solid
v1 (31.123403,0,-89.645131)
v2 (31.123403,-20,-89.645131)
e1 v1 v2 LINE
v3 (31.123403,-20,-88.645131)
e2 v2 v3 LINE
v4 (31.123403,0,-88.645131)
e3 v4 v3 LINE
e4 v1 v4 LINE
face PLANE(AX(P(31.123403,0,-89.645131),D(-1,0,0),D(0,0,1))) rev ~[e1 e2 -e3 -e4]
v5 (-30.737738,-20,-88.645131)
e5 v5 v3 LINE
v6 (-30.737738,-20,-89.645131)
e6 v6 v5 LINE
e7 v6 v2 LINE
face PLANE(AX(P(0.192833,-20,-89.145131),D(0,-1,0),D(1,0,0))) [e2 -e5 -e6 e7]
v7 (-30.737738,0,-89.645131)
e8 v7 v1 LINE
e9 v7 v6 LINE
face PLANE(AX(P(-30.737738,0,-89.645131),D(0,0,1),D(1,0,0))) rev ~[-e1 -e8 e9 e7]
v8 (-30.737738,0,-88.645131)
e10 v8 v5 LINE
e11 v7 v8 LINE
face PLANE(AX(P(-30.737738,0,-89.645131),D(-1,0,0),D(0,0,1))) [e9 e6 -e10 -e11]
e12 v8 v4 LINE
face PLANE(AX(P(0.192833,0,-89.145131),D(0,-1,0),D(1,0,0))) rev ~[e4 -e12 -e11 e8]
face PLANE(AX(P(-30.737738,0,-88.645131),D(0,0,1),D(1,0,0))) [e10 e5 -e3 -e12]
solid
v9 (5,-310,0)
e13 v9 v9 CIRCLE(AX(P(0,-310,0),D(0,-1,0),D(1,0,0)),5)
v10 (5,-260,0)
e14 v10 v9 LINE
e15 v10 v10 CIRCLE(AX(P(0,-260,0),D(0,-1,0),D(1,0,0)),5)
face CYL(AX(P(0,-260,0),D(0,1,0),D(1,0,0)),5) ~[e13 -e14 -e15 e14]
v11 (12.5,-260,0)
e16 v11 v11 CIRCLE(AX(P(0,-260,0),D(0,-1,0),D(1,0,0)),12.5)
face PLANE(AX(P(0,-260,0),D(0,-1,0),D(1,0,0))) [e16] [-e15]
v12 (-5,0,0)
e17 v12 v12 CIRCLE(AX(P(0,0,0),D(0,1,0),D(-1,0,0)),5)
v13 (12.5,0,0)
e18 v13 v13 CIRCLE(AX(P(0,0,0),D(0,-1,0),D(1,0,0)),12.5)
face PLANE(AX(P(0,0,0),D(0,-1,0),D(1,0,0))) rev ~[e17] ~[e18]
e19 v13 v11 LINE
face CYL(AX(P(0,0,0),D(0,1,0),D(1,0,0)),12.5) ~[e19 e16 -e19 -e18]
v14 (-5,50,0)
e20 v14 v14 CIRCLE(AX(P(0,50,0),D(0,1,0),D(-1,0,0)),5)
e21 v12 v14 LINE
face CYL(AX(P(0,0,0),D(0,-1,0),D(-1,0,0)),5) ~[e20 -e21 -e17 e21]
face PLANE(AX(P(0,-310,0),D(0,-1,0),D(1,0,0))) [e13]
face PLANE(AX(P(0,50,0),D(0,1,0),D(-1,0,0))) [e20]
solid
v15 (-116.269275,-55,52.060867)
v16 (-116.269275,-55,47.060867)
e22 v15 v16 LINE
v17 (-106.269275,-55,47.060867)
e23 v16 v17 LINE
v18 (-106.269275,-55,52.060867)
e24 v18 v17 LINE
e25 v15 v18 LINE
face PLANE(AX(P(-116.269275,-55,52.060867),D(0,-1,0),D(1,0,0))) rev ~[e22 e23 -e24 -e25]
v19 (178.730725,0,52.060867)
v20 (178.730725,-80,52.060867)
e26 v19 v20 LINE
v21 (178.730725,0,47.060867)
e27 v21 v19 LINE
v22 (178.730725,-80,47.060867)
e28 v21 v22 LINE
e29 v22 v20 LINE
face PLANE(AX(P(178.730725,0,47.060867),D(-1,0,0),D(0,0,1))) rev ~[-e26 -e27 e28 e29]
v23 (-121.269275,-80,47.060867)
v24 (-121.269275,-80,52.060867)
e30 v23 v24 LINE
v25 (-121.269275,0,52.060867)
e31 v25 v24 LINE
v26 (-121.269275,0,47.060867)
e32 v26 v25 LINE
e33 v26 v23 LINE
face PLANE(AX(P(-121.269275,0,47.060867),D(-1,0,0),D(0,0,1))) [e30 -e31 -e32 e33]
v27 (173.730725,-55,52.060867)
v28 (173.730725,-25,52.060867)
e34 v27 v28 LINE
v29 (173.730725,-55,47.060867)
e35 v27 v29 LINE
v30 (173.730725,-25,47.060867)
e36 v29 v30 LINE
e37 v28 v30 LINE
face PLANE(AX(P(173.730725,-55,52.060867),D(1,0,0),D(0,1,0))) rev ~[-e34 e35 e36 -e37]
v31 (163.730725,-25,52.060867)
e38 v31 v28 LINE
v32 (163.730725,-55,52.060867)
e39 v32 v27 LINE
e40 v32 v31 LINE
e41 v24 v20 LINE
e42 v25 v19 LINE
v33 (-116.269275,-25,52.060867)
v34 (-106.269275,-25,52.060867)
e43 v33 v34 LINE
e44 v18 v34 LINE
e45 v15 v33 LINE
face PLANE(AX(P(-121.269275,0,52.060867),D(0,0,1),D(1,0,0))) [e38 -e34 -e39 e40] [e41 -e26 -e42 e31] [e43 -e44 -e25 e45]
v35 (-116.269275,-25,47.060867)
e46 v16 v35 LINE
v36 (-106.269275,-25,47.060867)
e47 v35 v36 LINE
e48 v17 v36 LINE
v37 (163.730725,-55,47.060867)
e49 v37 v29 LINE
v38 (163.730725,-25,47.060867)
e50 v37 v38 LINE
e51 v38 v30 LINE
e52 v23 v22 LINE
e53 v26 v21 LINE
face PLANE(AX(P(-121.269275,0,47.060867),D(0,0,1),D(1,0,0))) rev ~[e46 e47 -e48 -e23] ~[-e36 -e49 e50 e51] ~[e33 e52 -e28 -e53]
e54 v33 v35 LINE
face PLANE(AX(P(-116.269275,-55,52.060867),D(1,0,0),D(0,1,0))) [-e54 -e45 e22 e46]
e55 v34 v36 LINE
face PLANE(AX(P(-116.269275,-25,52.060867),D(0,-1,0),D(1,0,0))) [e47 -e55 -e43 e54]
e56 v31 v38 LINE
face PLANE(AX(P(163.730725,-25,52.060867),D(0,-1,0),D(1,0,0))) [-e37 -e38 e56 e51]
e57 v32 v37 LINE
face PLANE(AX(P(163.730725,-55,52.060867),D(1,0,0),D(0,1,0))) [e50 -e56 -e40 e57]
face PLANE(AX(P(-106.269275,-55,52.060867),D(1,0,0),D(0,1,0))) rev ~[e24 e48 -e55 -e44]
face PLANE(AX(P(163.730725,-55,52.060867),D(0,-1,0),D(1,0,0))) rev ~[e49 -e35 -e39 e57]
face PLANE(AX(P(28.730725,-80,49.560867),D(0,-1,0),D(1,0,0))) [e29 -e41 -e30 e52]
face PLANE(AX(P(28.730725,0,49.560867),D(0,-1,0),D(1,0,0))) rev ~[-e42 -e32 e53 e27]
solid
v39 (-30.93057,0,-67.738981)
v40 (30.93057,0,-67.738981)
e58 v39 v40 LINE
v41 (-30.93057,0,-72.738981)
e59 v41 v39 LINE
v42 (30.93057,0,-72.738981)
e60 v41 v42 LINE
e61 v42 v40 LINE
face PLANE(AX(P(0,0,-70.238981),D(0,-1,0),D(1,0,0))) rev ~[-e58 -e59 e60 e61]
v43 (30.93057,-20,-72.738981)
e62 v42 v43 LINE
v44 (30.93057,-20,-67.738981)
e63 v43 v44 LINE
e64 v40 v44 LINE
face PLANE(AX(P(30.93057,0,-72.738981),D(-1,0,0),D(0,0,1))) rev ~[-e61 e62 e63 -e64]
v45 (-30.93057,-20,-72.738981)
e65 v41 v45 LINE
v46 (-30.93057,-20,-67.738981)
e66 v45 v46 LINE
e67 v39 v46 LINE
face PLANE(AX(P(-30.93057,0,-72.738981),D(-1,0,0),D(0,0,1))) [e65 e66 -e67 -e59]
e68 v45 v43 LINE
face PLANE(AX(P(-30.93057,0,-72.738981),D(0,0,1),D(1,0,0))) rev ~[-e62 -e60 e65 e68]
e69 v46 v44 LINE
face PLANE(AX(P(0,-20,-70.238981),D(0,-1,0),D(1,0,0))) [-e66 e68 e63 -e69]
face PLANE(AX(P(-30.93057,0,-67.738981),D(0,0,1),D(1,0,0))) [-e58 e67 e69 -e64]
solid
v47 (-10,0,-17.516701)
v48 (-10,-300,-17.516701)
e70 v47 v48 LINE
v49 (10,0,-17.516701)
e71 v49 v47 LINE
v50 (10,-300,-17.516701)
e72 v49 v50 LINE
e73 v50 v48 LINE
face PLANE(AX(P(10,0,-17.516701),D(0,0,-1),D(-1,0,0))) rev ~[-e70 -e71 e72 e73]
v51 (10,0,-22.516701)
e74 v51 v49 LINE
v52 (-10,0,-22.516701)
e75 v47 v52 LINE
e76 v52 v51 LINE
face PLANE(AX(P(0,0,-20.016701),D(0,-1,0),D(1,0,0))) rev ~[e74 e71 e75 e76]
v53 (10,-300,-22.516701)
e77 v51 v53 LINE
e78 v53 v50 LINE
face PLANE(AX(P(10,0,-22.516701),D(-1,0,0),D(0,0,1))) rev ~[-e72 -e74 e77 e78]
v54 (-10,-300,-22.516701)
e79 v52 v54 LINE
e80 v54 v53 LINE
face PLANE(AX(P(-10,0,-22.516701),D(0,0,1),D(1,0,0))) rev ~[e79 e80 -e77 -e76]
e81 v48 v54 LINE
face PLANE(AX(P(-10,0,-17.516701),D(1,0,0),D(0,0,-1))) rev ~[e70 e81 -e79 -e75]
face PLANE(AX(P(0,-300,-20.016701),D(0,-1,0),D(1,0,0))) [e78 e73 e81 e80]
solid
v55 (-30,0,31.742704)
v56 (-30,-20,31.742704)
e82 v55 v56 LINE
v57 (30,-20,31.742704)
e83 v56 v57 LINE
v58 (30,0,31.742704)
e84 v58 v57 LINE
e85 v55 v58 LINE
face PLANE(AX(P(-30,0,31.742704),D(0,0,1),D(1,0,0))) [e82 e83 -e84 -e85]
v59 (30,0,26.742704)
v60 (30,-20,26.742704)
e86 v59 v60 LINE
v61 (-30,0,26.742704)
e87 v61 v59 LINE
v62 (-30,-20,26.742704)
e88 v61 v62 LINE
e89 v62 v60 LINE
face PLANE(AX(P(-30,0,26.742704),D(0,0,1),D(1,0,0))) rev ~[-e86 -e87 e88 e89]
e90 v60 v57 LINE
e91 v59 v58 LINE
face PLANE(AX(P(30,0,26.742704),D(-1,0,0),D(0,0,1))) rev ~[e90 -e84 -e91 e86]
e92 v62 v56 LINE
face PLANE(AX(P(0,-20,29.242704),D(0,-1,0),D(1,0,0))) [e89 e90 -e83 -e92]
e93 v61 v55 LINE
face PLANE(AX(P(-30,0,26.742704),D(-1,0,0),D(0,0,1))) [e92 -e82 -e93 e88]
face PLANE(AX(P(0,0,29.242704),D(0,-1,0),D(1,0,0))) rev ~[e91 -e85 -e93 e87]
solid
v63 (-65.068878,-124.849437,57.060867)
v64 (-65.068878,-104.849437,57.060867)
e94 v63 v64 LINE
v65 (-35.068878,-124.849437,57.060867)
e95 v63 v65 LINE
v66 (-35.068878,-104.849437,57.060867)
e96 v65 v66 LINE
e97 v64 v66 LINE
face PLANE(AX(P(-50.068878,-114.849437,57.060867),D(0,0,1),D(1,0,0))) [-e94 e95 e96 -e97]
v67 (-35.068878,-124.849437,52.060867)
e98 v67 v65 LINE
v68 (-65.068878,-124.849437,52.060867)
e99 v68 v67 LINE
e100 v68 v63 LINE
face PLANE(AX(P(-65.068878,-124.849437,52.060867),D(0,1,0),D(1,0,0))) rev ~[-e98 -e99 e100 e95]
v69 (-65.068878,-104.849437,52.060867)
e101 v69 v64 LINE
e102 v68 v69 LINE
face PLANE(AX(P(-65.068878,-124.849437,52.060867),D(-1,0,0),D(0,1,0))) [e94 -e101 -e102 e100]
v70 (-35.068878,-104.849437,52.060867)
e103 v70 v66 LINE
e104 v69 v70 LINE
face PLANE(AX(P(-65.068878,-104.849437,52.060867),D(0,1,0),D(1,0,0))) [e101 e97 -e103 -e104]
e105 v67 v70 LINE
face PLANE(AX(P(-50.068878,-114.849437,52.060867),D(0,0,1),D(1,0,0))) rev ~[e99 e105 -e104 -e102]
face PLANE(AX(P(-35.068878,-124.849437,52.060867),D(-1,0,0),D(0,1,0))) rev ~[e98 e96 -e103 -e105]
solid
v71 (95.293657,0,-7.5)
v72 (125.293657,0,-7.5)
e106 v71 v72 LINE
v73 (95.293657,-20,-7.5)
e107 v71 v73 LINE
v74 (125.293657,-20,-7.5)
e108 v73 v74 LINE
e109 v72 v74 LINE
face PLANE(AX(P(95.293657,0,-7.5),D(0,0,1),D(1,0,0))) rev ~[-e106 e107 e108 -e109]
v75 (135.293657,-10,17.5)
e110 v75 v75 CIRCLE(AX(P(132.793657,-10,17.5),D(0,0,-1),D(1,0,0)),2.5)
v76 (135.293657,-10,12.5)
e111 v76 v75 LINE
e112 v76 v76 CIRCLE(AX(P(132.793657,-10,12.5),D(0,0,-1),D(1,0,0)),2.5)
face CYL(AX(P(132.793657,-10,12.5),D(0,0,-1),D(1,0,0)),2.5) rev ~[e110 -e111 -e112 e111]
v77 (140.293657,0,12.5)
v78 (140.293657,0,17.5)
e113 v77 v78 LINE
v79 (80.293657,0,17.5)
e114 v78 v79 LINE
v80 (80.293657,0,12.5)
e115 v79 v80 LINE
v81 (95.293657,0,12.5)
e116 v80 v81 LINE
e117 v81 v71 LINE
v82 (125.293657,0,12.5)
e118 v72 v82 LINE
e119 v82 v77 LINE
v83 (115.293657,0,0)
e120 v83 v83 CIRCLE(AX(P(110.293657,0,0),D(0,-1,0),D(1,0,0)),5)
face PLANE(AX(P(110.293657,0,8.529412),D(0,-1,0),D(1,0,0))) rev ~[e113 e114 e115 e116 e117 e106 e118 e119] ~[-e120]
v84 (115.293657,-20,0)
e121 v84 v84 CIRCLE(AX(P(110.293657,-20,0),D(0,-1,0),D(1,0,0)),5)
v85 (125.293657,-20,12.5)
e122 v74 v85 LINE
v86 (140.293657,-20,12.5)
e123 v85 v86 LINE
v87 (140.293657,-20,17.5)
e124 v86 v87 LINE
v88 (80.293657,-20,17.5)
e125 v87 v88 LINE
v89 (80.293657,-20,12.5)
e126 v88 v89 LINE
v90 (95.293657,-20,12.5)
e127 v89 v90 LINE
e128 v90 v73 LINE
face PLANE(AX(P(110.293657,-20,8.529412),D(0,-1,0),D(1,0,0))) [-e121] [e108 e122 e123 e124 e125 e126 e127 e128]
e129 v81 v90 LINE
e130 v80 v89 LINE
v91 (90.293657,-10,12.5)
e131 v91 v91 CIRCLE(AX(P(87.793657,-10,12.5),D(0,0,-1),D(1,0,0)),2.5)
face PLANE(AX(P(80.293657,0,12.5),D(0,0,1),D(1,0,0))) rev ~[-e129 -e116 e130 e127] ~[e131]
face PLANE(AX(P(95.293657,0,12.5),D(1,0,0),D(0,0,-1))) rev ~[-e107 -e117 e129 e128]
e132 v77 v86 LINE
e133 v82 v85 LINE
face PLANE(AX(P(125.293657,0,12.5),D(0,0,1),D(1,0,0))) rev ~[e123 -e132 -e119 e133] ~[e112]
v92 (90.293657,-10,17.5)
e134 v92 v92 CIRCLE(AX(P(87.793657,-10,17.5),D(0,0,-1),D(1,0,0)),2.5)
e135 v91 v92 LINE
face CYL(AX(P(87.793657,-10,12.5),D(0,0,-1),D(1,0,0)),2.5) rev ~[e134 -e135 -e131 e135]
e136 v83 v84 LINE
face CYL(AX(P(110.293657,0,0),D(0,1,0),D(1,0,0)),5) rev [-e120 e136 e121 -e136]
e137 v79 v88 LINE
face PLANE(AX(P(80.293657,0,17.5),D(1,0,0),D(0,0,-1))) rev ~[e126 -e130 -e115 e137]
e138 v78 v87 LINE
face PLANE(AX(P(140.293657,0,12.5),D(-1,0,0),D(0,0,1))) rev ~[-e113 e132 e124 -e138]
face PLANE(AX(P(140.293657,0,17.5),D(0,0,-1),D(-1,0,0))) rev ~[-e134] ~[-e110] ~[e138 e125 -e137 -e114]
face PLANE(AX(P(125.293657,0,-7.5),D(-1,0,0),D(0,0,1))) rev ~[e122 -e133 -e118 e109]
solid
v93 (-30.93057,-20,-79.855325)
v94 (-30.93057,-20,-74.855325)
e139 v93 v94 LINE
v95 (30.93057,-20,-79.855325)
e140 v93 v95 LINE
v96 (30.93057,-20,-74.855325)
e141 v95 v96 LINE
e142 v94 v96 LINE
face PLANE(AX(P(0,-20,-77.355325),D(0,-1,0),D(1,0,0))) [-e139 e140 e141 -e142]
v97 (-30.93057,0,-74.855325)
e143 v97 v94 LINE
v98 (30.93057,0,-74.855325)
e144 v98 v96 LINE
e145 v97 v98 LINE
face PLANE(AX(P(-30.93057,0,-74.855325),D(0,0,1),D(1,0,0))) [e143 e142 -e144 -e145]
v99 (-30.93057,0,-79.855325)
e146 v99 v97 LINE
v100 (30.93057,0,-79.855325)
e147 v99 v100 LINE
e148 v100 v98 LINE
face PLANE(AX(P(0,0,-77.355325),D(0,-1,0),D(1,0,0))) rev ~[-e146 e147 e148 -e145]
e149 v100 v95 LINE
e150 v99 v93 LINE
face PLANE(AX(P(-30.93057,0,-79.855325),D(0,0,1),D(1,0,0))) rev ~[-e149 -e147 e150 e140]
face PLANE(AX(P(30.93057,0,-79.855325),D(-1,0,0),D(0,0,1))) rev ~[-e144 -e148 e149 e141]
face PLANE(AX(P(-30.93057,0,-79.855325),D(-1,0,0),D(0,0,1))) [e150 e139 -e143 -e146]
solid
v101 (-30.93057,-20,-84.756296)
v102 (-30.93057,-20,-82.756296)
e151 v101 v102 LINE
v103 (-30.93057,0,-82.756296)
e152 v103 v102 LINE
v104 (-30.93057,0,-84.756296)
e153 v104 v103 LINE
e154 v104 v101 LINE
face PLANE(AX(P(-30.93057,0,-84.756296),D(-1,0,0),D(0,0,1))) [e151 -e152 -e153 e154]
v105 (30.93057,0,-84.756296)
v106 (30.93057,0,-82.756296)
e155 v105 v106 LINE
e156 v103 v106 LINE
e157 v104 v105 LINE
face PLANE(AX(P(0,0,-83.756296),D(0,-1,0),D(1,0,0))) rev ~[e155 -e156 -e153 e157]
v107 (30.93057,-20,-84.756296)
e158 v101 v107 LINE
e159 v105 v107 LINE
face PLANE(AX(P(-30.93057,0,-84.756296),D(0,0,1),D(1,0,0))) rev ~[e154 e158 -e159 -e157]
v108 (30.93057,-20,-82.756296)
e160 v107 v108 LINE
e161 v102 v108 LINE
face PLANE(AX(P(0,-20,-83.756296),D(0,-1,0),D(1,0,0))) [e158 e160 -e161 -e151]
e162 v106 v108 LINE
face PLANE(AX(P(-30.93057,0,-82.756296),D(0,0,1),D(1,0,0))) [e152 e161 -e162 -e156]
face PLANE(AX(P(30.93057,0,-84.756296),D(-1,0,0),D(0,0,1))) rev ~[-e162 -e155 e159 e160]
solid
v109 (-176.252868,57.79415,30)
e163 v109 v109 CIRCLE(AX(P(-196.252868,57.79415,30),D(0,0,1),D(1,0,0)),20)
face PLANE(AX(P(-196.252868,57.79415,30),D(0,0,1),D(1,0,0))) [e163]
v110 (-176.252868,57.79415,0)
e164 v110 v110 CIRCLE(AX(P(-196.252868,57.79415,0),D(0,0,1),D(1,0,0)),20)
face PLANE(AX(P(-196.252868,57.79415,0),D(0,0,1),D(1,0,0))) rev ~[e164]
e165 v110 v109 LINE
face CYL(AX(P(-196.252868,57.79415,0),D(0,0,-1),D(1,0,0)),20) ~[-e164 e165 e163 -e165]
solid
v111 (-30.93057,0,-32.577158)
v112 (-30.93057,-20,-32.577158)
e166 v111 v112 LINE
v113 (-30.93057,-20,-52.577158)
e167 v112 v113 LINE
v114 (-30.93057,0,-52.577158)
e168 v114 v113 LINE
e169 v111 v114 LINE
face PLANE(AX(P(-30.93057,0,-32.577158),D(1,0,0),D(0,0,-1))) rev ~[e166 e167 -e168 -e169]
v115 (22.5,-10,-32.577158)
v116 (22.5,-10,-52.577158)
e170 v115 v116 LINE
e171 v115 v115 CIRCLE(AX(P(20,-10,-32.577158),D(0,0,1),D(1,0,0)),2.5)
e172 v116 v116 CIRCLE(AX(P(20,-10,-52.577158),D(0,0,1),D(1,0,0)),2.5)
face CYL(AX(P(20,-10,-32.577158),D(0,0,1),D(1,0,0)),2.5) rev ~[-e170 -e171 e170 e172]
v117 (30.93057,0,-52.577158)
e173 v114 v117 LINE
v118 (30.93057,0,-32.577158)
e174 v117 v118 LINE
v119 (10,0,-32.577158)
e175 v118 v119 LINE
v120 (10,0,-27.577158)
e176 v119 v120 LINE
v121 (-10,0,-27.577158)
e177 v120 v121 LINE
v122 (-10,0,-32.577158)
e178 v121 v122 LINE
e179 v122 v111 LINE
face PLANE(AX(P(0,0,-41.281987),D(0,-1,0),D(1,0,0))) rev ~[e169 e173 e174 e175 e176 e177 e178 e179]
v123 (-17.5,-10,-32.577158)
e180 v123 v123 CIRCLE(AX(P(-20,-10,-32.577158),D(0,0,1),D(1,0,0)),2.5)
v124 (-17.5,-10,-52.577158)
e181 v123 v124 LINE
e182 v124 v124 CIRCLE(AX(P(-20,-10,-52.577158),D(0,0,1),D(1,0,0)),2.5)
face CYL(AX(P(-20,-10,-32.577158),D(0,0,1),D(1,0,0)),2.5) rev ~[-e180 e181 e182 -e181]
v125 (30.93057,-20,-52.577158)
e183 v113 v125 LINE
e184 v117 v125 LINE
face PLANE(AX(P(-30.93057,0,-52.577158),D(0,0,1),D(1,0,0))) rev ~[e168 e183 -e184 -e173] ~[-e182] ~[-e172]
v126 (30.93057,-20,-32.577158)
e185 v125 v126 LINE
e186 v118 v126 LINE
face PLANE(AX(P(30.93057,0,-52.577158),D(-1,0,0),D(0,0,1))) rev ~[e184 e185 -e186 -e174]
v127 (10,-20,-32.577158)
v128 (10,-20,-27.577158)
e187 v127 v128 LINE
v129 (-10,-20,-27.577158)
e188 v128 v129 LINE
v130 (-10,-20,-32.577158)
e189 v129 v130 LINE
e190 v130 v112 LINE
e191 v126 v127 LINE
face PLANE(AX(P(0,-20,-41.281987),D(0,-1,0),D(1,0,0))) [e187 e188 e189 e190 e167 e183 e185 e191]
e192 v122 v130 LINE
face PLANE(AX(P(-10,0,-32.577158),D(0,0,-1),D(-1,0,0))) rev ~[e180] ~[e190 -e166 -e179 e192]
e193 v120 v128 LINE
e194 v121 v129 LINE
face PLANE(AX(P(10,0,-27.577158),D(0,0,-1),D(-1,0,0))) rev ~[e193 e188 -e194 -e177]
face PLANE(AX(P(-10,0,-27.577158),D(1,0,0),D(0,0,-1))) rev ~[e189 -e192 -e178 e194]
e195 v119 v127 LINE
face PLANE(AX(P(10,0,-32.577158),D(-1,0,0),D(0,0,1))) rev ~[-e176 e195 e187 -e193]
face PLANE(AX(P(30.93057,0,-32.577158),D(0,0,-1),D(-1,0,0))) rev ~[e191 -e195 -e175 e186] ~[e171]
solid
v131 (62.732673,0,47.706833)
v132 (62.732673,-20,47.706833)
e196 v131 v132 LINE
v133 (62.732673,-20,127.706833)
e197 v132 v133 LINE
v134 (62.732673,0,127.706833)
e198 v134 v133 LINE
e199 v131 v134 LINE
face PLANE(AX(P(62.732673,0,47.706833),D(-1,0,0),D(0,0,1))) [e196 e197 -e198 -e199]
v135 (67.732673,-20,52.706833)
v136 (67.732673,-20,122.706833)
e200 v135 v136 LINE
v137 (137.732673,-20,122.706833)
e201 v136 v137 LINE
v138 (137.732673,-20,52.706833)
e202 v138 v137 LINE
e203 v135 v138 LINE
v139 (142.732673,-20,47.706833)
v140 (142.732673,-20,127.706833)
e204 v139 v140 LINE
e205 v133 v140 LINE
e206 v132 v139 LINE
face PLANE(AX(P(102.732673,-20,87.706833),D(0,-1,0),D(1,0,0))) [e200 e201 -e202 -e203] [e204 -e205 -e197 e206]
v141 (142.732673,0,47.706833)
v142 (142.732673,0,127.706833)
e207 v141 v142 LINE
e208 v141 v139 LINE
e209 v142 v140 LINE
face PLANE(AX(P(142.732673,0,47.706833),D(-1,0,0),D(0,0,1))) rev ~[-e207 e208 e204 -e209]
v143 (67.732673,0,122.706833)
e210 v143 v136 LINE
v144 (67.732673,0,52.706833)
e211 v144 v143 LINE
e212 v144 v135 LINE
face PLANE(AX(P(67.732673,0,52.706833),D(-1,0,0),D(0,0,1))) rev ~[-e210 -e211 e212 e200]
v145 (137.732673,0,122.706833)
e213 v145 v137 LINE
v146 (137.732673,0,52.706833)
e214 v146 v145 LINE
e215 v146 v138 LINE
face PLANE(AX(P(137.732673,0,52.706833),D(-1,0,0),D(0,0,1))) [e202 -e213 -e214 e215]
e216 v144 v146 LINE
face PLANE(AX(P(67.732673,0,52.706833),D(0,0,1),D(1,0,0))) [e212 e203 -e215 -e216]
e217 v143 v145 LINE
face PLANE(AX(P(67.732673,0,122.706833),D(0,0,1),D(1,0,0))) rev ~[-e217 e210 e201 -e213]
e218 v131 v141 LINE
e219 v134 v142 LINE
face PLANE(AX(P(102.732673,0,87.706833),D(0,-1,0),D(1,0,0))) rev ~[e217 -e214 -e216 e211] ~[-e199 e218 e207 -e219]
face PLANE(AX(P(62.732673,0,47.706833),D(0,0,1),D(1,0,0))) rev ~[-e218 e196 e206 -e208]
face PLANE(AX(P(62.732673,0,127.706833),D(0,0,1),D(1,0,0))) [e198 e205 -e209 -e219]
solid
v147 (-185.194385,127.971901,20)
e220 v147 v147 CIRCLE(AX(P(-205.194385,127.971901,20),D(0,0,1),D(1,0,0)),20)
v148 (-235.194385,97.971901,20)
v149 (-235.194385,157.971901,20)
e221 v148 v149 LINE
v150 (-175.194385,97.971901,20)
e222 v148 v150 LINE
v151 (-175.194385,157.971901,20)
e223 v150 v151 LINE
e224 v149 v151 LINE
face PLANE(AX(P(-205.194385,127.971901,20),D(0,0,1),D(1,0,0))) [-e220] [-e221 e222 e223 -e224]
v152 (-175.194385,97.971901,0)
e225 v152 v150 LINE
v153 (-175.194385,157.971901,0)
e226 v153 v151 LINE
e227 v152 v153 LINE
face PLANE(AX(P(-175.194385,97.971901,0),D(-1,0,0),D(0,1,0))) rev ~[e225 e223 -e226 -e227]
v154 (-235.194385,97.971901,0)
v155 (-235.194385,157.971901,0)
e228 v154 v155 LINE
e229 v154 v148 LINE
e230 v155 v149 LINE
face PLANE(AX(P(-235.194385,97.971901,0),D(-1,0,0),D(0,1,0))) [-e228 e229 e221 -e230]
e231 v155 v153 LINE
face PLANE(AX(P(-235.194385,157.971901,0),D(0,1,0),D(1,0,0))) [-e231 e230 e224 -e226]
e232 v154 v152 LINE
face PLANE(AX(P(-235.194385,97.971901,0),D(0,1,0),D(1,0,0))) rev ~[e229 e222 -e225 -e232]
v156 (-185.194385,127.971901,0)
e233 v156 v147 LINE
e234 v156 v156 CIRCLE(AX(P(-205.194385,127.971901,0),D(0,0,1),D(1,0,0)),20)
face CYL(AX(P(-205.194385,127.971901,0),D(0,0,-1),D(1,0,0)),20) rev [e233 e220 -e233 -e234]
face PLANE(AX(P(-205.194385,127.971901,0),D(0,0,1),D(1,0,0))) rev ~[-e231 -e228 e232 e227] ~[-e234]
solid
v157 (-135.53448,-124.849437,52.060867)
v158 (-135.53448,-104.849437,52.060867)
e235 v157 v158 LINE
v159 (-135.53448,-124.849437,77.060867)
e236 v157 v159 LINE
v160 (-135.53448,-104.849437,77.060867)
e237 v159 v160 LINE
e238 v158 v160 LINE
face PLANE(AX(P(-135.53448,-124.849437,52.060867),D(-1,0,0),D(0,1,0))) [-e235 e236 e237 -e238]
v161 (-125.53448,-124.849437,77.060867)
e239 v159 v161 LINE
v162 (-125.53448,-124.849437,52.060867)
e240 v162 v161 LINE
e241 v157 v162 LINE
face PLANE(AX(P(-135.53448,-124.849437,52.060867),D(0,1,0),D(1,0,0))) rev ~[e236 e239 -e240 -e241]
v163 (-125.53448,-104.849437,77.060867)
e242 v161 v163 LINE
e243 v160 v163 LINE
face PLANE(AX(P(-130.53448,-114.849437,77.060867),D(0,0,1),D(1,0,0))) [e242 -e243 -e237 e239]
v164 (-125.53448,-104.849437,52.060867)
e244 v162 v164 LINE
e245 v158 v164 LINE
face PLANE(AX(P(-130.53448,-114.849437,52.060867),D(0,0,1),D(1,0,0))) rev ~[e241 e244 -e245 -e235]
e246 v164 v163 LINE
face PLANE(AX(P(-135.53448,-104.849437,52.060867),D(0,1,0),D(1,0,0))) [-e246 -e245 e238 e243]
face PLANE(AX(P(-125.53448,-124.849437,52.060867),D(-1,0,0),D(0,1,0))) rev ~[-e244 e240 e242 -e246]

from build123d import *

# Parameters (mm, degrees)
F0_R      = 5
F1_DEPTH  = 20
F0_W      = 60
F0_H      = 5
F0_W_2    = 80
F0_H_2    = 80
F0_W_3    = 70
F0_H_3    = 70
F0_W_4    = 61.861140081
F0_H_4    = 1
F0_H_5    = 2
F0_R_2    = 12.5
F2_DEPTH  = 260
F3_R      = 5
F4_DEPTH  = 50
F5_DEPTH  = 300
F6_R      = 2.5
F7_R      = 2.5
F8_DEPTH  = 25
F10_R     = 2.5
F9_R      = 2.5
F11_DEPTH = 25
F16_R     = 5
F17_DEPTH = 50
F18_W     = 300
F18_H     = 5
F19_DEPTH = 80
F21_R     = 20
F22_DEPTH = 30
F21_W     = 60
F21_H     = 60
F23_DEPTH = 20
F20_W     = 10
F20_H     = 30
F24_DEPTH = 141.7069985357
F20_H_2   = 20
F25_DEPTH = 25
F20_W_2   = 30
F26_DEPTH = 5


# Not quite as in the source:
# - a feature of the source that left no trace in its solid (it failed there, or was rolled back) is left out
# - a feature names something its author has since deleted; it is built from what else it names


with BuildPart() as f1:
    # F0 (on Front) → F1 (new body)
    with BuildSketch(Plane.XZ):
        Polygon((95.2936565876, -7.5), (110.2936565876, -7.5), (125.2936565876, -7.5), (125.2936565876, 12.5), (140.2936565876, 12.5), (140.2936565876, 17.5), (110.2936565876, 17.5), (80.2936565876, 17.5), (80.2936565876, 12.5), (95.2936565876, 12.5), align=None)
        with Locations((110.2936565876, 0)):
            Circle(F0_R, mode=Mode.SUBTRACT)
    extrude(amount=F1_DEPTH)

    # F10 (on face) + F9 (on face) → F11 (cut)
    with BuildSketch(Plane(origin=(0, 0, 12.5), x_dir=(1, 0, 0), z_dir=(0, 0, -1))):
        with Locations((87.7936565876, 10)):
            Circle(F10_R)
    with BuildSketch(Plane(origin=(0, 0, 12.5), x_dir=(1, 0, 0), z_dir=(0, 0, -1))):
        with Locations((132.7936565876, 10)):
            Circle(F9_R)
    extrude(amount=-F11_DEPTH, mode=Mode.SUBTRACT)


with BuildPart() as f1b:
    # F0 (on Front) → F1, piece 2 (new body)
    with BuildSketch(Plane.XZ):
        with Locations((0, 29.2427036911)):
            Rectangle(F0_W, F0_H)
    extrude(amount=F1_DEPTH)


with BuildPart() as f1c:
    # F0 (on Front) → F1, piece 3 (new body)
    with BuildSketch(Plane.XZ):
        Polygon((10, -27.5771580637), (0, -27.5771580637), (-10, -27.5771580637), (-10, -32.5771580637), (-10.9305700405, -32.5771580637), (-30.9305700405, -32.5771580637), (-30.9305700405, -52.5771580637), (0, -52.5771580637), (30.9305700405, -52.5771580637), (30.9305700405, -32.5771580637), (10.9305700405, -32.5771580637), (10, -32.5771580637), align=None)
    extrude(amount=F1_DEPTH)

    # F6 (on face) + F7 (on face) → F8 (cut)
    with BuildSketch(Plane.XY.offset(-32.5771580637)):
        with Locations((-20, -10)):
            Circle(F6_R)
    with BuildSketch(Plane.XY.offset(-32.5771580637)):
        with Locations((20, -10)):
            Circle(F7_R)
    extrude(amount=-F8_DEPTH, mode=Mode.SUBTRACT)


with BuildPart() as f1d:
    # F0 (on Front) → F1, piece 4 (new body)
    with BuildSketch(Plane.XZ):
        with Locations((102.7326732874, 87.7068325877)):
            Rectangle(F0_W_2, F0_H_2)
        with Locations((102.7326732874, 87.7068325877)):
            Rectangle(F0_W_3, F0_H_3, mode=Mode.SUBTRACT)
    extrude(amount=F1_DEPTH)


with BuildPart() as f1e:
    # F0 (on Front) → F1, piece 5 (new body)
    with BuildSketch(Plane.XZ):
        with Locations((0, -77.355325222)):
            Rectangle(F0_W_4, F0_H)
    extrude(amount=F1_DEPTH)


with BuildPart() as f1f:
    # F0 (on Front) → F1, piece 6 (new body)
    with BuildSketch(Plane.XZ):
        with Locations((0.1928325291, -89.1451310813)):
            Rectangle(F0_W_4, F0_H_4)
    extrude(amount=F1_DEPTH)


with BuildPart() as f1g:
    # F0 (on Front) → F1, piece 7 (new body)
    with BuildSketch(Plane.XZ):
        with Locations((0, -83.756296128)):
            Rectangle(F0_W_4, F0_H_5)
    extrude(amount=F1_DEPTH)


with BuildPart() as f1h:
    # F0 (on Front) → F1, piece 8 (new body)
    with BuildSketch(Plane.XZ):
        with Locations((0, -70.2389810979)):
            Rectangle(F0_W_4, F0_H)
    extrude(amount=F1_DEPTH)


with BuildPart() as f2:
    # F0 (on Front) → F2 (new body)
    with BuildSketch(Plane.XZ):
        Circle(F0_R_2)
    extrude(amount=F2_DEPTH)

    # F3 (on face) → F4 (join)
    with BuildSketch(Plane.XZ.offset(260)):
        Circle(F3_R)
    extrude(amount=F4_DEPTH)

    # F16 (on face) → F17 (join)
    with BuildSketch(Plane(origin=(0, 0, 0), x_dir=(-1, 0, 0), z_dir=(0, 1, 0))):
        Circle(F16_R)
    extrude(amount=F17_DEPTH)


with BuildPart() as f5:
    # F0 (on Front) → F5 (new body)
    with BuildSketch(Plane.XZ):
        Polygon((-10, -22.5167013705), (0, -22.5167013705), (10, -22.5167013705), (10, -17.5167013705), (0, -17.5167013705), (-10, -17.5167013705), align=None)
    extrude(amount=F5_DEPTH)


with BuildPart() as f19:
    # F18 (on Front) → F19 (new body)
    with BuildSketch(Plane.XZ):
        with Locations((28.7307251245, 49.5608674544)):
            Rectangle(F18_W, F18_H)
    extrude(amount=F19_DEPTH)

    # F20 (on face) → F24 (cut, through all)
    with BuildSketch(Plane.XY.offset(52.0608674544)):
        with Locations((-111.2692748755, -40)):
            Rectangle(F20_W, F20_H)
        with Locations((168.7307251245, -40)):
            Rectangle(F20_W, F20_H)
    extrude(amount=-F24_DEPTH, mode=Mode.SUBTRACT)


with BuildPart() as f22:
    # F21 (on Top) → F22 (new body)
    with BuildSketch(Plane.XY):
        with Locations((-196.2528675795, 57.794149965)):
            Circle(F21_R)
    extrude(amount=F22_DEPTH)


with BuildPart() as f23:
    # F21 (on Top) → F23 (new body)
    with BuildSketch(Plane.XY):
        with Locations((-205.1943850517, 127.9719012976)):
            Rectangle(F21_W, F21_H)
        with Locations((-205.1943850517, 127.9719012976)):
            Circle(F21_R, mode=Mode.SUBTRACT)
    extrude(amount=F23_DEPTH)


with BuildPart() as f25:
    # F20 (on face) → F25 (new body)
    with BuildSketch(Plane.XY.offset(52.0608674544)):
        with Locations((-130.5344802141, -114.8494374752)):
            Rectangle(F20_W, F20_H_2)
    extrude(amount=F25_DEPTH)


with BuildPart() as f26:
    # F20 (on face) → F26 (new body)
    with BuildSketch(Plane.XY.offset(52.0608674544)):
        with Locations((-50.0688782334, -114.8494374752)):
            Rectangle(F20_W_2, F20_H_2)
    extrude(amount=F26_DEPTH)


solid = Compound([f1.part, f1b.part, f1c.part, f1d.part, f1e.part, f1f.part, f1g.part, f1h.part, f2.part, f5.part, f19.part, f22.part, f23.part, f25.part, f26.part])
